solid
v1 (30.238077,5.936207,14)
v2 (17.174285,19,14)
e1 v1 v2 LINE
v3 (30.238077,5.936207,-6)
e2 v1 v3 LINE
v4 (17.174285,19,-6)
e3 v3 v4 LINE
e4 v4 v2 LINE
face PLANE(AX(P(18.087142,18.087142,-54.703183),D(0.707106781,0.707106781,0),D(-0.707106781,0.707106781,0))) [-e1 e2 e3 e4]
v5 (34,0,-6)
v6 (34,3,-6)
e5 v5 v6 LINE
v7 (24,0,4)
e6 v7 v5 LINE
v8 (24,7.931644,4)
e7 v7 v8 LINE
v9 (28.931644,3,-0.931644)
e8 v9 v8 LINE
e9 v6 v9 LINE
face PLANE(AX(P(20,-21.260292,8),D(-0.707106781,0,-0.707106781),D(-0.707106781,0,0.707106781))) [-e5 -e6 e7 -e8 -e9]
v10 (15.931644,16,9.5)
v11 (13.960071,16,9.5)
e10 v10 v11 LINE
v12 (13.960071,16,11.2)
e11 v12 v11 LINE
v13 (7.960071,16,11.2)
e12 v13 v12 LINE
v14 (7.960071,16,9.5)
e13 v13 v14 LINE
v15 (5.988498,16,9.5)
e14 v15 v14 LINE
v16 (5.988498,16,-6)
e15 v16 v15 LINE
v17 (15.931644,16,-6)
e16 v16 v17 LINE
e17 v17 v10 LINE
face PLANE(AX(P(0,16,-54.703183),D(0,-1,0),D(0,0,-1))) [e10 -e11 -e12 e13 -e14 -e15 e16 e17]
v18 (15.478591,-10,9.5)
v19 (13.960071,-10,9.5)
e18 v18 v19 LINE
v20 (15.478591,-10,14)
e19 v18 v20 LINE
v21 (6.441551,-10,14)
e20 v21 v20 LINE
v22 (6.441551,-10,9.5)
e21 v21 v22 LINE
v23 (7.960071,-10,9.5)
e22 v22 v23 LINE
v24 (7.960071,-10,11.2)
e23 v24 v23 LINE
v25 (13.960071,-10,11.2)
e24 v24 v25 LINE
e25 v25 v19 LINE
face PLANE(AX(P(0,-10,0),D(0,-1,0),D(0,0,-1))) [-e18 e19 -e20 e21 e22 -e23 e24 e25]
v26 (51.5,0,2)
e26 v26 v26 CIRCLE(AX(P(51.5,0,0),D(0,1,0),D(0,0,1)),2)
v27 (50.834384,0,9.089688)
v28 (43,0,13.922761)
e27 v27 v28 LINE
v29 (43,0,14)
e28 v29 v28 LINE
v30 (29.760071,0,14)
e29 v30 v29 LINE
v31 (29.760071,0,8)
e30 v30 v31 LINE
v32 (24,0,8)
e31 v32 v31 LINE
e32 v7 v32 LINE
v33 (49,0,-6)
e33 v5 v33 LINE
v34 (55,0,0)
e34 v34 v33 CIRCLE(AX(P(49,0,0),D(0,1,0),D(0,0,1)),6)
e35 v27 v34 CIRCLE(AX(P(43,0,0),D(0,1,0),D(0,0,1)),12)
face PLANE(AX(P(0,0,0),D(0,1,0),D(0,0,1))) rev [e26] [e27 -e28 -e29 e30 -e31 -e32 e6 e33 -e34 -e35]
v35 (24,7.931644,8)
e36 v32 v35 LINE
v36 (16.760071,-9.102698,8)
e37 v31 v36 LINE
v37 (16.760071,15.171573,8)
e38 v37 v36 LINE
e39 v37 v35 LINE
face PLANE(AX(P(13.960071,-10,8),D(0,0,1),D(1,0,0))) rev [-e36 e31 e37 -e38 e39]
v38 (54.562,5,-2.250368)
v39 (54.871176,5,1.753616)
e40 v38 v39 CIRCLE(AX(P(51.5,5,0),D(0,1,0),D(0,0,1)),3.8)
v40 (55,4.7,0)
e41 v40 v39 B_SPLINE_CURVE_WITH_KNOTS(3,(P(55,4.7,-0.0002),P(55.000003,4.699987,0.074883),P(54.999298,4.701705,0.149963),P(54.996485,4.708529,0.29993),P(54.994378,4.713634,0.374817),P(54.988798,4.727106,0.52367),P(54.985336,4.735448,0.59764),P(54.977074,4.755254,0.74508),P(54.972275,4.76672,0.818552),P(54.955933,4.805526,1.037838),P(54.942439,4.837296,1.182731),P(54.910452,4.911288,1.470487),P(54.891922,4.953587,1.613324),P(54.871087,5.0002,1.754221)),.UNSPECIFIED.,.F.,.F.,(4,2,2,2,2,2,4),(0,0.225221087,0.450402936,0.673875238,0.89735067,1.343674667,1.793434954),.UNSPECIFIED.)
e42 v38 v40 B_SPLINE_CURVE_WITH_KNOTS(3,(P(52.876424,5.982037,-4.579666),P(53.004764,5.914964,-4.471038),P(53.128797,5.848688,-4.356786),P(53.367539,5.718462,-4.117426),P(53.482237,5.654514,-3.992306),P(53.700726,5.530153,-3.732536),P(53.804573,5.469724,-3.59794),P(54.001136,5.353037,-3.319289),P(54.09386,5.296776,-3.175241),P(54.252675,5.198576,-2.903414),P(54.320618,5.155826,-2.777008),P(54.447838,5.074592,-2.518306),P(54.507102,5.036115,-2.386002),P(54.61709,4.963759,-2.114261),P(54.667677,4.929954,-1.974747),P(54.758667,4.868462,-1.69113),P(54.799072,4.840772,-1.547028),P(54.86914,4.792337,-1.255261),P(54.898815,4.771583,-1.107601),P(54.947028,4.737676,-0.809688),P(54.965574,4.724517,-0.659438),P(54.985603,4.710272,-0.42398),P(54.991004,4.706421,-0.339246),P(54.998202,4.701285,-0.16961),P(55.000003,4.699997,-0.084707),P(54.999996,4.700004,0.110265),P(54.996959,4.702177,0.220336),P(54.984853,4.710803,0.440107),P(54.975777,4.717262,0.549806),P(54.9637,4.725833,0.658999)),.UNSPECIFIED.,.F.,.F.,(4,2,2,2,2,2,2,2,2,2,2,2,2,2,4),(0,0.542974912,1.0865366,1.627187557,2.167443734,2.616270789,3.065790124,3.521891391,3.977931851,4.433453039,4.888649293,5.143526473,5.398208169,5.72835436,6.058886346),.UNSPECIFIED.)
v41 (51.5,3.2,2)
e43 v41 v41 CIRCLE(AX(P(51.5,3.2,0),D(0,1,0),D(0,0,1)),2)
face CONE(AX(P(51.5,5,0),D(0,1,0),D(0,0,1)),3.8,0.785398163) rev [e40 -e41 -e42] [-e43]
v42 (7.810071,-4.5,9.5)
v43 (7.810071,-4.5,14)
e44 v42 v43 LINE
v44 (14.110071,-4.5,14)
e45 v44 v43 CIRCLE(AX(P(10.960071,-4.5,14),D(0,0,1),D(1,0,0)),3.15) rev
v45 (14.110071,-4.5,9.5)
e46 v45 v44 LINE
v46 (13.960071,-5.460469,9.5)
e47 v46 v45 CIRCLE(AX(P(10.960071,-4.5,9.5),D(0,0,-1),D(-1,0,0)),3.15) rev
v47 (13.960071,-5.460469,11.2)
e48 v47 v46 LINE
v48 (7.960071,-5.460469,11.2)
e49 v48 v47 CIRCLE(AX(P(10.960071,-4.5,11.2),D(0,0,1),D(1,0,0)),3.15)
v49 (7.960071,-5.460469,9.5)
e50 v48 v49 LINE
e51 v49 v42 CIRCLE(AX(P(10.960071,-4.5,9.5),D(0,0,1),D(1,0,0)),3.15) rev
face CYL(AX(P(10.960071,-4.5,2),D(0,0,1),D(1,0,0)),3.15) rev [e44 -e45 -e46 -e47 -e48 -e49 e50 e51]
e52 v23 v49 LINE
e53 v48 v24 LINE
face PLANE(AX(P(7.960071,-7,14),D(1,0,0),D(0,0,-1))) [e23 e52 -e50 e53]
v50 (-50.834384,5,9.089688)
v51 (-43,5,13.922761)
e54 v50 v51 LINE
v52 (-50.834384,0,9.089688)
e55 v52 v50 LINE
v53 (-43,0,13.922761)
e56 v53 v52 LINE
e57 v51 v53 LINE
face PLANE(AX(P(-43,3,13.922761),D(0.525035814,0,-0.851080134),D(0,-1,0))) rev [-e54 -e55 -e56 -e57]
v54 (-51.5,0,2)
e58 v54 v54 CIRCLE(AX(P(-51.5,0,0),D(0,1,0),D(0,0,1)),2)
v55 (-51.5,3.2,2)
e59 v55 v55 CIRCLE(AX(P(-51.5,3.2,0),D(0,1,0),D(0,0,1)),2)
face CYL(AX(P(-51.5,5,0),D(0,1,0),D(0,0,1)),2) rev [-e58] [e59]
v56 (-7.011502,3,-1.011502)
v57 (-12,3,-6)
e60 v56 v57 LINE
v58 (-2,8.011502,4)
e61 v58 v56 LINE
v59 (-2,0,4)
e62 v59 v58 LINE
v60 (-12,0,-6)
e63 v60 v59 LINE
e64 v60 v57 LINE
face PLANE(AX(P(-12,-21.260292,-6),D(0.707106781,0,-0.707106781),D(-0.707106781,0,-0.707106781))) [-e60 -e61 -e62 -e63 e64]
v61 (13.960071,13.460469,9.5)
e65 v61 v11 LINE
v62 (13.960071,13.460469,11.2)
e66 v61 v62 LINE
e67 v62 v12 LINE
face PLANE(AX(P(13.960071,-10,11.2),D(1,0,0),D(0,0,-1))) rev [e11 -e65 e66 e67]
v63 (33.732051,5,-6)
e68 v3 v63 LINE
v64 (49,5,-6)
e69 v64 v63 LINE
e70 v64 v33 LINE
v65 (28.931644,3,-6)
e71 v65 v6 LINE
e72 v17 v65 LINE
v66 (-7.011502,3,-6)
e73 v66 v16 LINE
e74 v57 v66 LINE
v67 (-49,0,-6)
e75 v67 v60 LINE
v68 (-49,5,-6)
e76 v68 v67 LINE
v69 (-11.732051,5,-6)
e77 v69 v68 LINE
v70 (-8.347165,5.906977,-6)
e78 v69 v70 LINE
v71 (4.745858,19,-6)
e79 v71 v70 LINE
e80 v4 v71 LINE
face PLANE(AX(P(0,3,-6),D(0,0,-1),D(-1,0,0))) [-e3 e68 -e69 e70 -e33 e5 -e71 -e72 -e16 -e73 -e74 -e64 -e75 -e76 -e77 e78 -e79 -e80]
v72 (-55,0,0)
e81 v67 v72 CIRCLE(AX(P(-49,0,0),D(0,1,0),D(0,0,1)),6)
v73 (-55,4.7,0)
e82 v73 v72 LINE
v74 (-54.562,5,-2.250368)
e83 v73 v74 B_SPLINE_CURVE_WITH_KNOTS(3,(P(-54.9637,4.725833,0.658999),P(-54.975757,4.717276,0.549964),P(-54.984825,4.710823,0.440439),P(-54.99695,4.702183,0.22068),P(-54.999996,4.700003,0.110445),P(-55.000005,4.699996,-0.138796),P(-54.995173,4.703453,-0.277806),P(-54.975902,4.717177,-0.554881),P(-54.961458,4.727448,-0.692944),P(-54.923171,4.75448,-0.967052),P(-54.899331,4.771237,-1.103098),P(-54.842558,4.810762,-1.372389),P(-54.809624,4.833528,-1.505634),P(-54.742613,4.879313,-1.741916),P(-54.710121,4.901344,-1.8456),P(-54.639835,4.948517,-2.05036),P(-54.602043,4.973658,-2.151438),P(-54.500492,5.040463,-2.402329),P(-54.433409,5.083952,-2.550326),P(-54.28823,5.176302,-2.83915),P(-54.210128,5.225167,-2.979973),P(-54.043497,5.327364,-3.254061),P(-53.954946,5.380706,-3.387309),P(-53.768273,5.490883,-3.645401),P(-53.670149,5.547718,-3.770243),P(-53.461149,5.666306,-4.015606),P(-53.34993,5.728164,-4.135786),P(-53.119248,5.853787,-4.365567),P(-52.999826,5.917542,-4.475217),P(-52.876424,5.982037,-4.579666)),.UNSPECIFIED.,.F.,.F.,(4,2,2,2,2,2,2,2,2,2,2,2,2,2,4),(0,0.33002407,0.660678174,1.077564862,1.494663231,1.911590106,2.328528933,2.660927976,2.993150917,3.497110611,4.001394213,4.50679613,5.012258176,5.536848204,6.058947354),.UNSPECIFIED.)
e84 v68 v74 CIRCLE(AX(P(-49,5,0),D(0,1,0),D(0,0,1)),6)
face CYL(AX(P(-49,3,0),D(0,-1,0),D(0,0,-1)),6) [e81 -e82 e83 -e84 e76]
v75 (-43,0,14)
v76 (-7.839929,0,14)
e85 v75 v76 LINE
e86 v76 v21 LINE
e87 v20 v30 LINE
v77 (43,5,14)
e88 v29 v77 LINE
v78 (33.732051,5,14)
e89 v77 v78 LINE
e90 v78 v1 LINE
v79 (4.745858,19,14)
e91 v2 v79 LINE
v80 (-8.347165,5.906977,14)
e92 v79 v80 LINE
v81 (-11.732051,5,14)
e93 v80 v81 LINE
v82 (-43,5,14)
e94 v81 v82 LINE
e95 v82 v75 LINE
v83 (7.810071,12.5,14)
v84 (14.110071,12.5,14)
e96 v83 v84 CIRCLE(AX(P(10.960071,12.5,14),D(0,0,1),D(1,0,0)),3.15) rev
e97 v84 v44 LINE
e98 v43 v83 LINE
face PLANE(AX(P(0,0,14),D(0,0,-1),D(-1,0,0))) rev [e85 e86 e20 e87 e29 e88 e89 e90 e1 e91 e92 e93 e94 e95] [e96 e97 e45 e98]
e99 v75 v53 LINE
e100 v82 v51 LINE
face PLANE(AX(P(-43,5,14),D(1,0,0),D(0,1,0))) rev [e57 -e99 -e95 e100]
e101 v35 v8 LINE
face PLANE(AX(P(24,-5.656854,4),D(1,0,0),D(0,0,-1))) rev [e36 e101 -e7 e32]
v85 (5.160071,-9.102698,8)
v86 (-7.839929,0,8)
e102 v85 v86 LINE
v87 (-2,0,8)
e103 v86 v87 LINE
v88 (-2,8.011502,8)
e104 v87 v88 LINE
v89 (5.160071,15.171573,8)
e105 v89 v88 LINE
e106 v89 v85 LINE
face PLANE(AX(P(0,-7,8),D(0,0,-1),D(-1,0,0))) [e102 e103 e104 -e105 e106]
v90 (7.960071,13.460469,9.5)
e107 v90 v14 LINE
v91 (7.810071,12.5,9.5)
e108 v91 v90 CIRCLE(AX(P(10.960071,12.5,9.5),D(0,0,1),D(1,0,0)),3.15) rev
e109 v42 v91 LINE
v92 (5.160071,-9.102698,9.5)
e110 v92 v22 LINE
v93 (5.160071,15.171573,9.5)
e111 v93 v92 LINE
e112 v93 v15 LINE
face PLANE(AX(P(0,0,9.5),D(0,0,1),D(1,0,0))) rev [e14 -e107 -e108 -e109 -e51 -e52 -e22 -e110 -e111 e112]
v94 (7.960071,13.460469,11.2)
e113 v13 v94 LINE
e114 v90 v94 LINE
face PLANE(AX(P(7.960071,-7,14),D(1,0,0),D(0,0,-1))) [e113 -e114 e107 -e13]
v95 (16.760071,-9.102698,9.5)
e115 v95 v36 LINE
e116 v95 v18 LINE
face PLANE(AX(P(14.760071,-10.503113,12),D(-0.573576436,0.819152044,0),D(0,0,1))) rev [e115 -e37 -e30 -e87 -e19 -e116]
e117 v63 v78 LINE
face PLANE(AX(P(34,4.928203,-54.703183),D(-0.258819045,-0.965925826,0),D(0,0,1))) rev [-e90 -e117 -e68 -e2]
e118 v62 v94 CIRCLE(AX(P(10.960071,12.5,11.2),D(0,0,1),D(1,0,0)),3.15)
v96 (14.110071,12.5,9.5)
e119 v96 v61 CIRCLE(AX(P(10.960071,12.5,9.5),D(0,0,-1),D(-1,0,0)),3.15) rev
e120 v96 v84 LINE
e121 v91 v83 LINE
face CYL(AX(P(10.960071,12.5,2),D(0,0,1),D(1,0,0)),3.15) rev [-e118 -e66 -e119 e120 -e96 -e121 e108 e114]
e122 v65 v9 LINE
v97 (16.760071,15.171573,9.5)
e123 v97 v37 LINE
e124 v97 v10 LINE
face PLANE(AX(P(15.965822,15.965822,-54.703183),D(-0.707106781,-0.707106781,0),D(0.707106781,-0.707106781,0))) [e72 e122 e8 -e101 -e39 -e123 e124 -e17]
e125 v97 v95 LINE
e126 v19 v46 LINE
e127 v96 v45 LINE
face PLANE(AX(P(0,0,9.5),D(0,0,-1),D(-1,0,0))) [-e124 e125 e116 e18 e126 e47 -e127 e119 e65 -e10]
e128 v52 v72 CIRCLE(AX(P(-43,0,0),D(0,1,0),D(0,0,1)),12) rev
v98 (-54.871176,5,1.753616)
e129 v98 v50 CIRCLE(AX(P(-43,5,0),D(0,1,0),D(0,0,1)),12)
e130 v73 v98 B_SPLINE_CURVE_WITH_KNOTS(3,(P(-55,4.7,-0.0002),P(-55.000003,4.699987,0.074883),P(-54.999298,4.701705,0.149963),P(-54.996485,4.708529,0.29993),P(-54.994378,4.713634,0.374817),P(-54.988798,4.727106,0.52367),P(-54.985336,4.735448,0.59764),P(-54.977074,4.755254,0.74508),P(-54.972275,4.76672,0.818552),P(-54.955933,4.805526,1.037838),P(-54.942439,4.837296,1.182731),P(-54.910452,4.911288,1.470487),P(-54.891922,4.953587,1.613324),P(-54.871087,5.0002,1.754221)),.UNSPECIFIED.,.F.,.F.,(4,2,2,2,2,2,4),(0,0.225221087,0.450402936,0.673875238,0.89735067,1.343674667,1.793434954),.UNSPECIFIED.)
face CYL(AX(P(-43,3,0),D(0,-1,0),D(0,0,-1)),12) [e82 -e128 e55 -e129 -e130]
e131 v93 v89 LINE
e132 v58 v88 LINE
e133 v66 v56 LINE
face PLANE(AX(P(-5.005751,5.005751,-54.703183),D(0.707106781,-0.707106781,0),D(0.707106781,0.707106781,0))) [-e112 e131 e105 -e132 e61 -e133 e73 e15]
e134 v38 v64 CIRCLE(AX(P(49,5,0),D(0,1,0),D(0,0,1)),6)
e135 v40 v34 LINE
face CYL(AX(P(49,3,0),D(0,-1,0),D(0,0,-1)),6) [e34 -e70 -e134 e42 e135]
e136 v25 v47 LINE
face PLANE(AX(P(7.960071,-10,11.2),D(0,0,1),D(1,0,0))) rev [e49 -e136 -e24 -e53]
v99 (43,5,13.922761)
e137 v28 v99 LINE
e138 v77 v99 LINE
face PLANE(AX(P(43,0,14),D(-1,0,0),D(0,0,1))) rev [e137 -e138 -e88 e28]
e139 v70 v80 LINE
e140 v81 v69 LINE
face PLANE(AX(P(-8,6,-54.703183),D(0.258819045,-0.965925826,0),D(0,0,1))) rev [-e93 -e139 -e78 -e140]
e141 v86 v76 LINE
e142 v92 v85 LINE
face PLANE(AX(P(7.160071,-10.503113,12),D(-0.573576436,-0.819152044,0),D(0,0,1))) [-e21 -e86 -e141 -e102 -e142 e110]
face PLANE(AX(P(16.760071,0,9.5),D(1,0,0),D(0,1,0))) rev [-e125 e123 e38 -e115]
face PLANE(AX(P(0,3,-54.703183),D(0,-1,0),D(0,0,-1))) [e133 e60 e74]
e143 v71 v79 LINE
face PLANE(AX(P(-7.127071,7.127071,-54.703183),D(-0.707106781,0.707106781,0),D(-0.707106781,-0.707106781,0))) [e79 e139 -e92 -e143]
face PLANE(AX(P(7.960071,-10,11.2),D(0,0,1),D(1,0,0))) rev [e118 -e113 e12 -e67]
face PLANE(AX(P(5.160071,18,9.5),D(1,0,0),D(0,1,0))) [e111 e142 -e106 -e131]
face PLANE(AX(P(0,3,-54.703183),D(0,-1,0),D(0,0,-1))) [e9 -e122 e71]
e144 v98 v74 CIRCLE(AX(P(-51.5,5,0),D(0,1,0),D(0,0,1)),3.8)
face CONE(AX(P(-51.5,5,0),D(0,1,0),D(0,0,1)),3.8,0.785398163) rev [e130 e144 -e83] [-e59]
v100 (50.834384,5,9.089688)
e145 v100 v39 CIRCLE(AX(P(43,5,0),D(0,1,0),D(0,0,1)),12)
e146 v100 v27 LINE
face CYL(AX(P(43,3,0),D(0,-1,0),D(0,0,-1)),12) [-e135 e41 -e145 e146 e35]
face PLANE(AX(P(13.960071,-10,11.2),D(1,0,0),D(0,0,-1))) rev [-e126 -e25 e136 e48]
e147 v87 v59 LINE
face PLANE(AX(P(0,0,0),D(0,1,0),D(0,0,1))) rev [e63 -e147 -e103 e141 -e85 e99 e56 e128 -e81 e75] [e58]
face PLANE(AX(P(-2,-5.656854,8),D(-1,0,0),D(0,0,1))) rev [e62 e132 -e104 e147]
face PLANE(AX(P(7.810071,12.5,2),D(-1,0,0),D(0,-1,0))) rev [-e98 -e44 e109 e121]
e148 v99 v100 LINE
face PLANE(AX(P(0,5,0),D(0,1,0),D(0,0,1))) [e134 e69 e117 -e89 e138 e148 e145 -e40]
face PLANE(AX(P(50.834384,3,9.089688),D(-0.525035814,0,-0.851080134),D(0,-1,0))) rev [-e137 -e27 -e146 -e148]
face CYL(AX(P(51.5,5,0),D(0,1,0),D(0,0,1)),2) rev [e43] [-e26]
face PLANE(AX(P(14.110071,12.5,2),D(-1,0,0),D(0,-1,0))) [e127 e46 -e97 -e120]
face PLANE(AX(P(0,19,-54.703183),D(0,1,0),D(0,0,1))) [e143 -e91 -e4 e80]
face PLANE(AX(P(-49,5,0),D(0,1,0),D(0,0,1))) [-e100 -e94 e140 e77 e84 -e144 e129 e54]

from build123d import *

# Parameters (mm, degrees)
BOSS_EXTRUDE1_DEPTH           = 3
CUT_EXTRUDE1_DEPTH            = 10
CUT_EXTRUDE3_START            = 8
SKETCH8_W                     = 6
SKETCH8_H                     = 3
CUT_EXTRUDE3_DEPTH            = 6
BOSS_EXTRUDE4_START           = 18
BOSS_EXTRUDE4_DEPTH           = 28
BOSS_EXTRUDE5_DEPTH           = 3
CUT_EXTRUDE4_DEPTH            = 3
CUT_EXTRUDE5_DEPTH            = 10
SKETCH18_R                    = 1.5
BOSS_EXTRUDE9_DEPTH           = 2
CHAMFER1_SIZE                 = 15
CHAMFER2_SIZE                 = 15
CHAMFER2_SIZE_2               = 10.503113073
CUT_EXTRUDE6_DEPTH            = 5
BOSS_EXTRUDE8_DEPTH           = 2
CHAMFER3_DEPTH                = 6
CHAMFER3_2_DEPTH              = 5
CSK_FOR_M4_SFHCS1_D           = 4
CSK_FOR_M4_SFHCS1_DEPTH       = 30.798278762
CSK_FOR_M4_SFHCS1_CSINK_D     = 7.6
CSK_FOR_M4_SFHCS1_CSINK_ANGLE = 90
CSK_FOR_M4_SFHCS1_TIP         = 1.201721238
CUT_EXTRUDE7_DEPTH            = 1.5
BOSS_EXTRUDE10_START          = -6
BOSS_EXTRUDE10_DEPTH          = 20
CHAMFER4_SIZE                 = 1.07179677
CHAMFER4_SIZE_2               = 4


with BuildPart() as part:
    # Sketch1 → Boss-Extrude1 (new body)
    with BuildSketch(Plane(origin=(0, 0, 0), x_dir=(1, 0, 0), z_dir=(0, 1, 0))):
        with BuildLine():
            ThreePointArc((-49, -6), (-53.242640687, -4.242640687), (-55, 0))
            ThreePointArc((-55, 0), (-51.485281374, -8.485281374), (-43, -12))
            Line((-43, -12), (43, -12))
            ThreePointArc((43, -12), (51.485281374, -8.485281374), (55, 0))
            ThreePointArc((55, 0), (53.242640687, -4.242640687), (49, -6))
            Line((49, -6), (-49, -6))
        make_face()
        with BuildLine():
            Line((-53, 0), (-55, 0))
            ThreePointArc((-55, 0), (-53.242640687, -4.242640687), (-49, -6))
            Line((-49, -6), (49, -6))
            ThreePointArc((49, -6), (53.242640687, -4.242640687), (55, 0))
            Line((55, 0), (53, 0))
            ThreePointArc((53, 0), (51.5, -1.5), (50, 0))
            Line((50, 0), (-50, 0))
            ThreePointArc((-50, 0), (-51.5, -1.5), (-53, 0))
        make_face()
        with BuildLine():
            Line((49, 6), (-49, 6))
            ThreePointArc((-49, 6), (-53.242640687, 4.242640687), (-55, 0))
            Line((-55, 0), (-53, 0))
            ThreePointArc((-53, 0), (-51.5, 1.5), (-50, 0))
            Line((-50, 0), (50, 0))
            ThreePointArc((50, 0), (51.5, 1.5), (53, 0))
            Line((53, 0), (55, 0))
            ThreePointArc((55, 0), (53.242640687, 4.242640687), (49, 6))
        make_face()
    extrude(amount=BOSS_EXTRUDE1_DEPTH)

    # Sketch2 → Cut-Extrude1 (cut)
    with BuildSketch(Plane(origin=(0, 3, 0), x_dir=(1, 0, 0), z_dir=(0, 1, 0))):
        Polygon((22, -8), (36, 6), (-14, 6), (0, -8), align=None)
    extrude(amount=-CUT_EXTRUDE1_DEPTH, mode=Mode.SUBTRACT)

    # Sketch8 → Cut-Extrude3 (cut)
    with BuildSketch(Plane.XY.offset(CUT_EXTRUDE3_START)):
        with Locations((10.960071178, 1.5)):
            Rectangle(SKETCH8_W, SKETCH8_H)
    extrude(amount=CUT_EXTRUDE3_DEPTH, mode=Mode.SUBTRACT)


with BuildPart() as cut_extrude3_piece_1:
    # of the separate pieces the step leaves, piece 1, a body of its own (cut_extrude3_pieces)
    add(part.part.solids().sort_by_distance((-55, 0, 0))[0])

    # Sketch9 → Boss-Extrude4 (add)
    with BuildSketch(Plane(origin=(0, 0, 0), x_dir=(1, 0, 0), z_dir=(0, 1, 0)).offset(BOSS_EXTRUDE4_START)):
        Polygon((13.960071178, -11.2), (13.960071178, -8), (14.760071178, -8), (14.760071178, -12), (7.160071178, -12), (7.160071178, -8), (7.960071178, -8), (7.960071178, -11.2), align=None)
    extrude(amount=-BOSS_EXTRUDE4_DEPTH)


with BuildPart() as cut_extrude3_piece_2:
    # of the separate pieces the step leaves, piece 2, a body of its own (cut_extrude3_pieces)
    add(part.part.solids().sort_by_distance((13.960071178, 0, 12))[0])


with BuildPart() as cut_extrude3_piece_1_1:
    add(cut_extrude3_piece_1.part)

    # Combine1: union Cut-Extrude3 piece 2
    add(cut_extrude3_piece_2.part)

    # Sketch11 → Boss-Extrude5 (add)
    with BuildSketch(Plane(origin=(0, 3, 0), x_dir=(1, 0, 0), z_dir=(0, 1, 0))):
        Polygon((-14, 6), (-12, 6), (2, -8), (0, -8), align=None)
        Polygon((20, -8), (34, 6), (36, 6), (22, -8), align=None)
    extrude(amount=-BOSS_EXTRUDE5_DEPTH)

    # Sketch13 → Cut-Extrude4 (cut)
    with BuildSketch(Plane(origin=(0, 3, 0), x_dir=(1, 0, 0), z_dir=(0, 1, 0))):
        Polygon((2, -8), (-2, -8), (-2, -4), align=None)
        Polygon((24, -4), (24, -8), (20, -8), align=None)
    extrude(amount=-CUT_EXTRUDE4_DEPTH, mode=Mode.SUBTRACT)

    # Sketch15 → Cut-Extrude5 (cut)
    with BuildSketch(Plane.XY.offset(12)):
        with BuildLine():
            Line((14.110071178, 12.5), (14.110071178, -4.5))
            ThreePointArc((14.110071178, -4.5), (10.960071178, -7.65), (7.810071178, -4.5))
            Line((7.810071178, -4.5), (7.810071178, 12.5))
            ThreePointArc((7.810071178, 12.5), (10.960071178, 15.65), (14.110071178, 12.5))
        make_face()
    extrude(amount=-CUT_EXTRUDE5_DEPTH, mode=Mode.SUBTRACT)

    # Sketch18 → Boss-Extrude9 (add)
    # profile 1 of 2: a face of its own
    with BuildSketch(Plane(origin=(0, 3, 0), x_dir=(1, 0, 0), z_dir=(0, 1, 0))):
        with BuildLine():
            Line((7.160071178, -8), (-2, -8))
            Line((-2, -8), (-2, -4))
            Line((-2, -4), (-12, 6))
            Line((-12, 6), (-49, 6))
            ThreePointArc((-49, 6), (-53.242640687, 4.242640687), (-55, 0))
            ThreePointArc((-55, 0), (-51.485281374, -8.485281374), (-43, -12))
            Line((-43, -12), (7.160071178, -12))
            Line((7.160071178, -12), (7.160071178, -8))
        make_face()
        with Locations(Location((-51.5, 0, 0), (0, 0, 270))):
            Circle(SKETCH18_R, mode=Mode.SUBTRACT)
    # profile 2 of 2: a face of its own
    with BuildSketch(Plane(origin=(0, 3, 0), x_dir=(1, 0, 0), z_dir=(0, 1, 0))):
        with BuildLine():
            Line((24, -4), (24, -8))
            Line((24, -8), (14.760071178, -8))
            Line((14.760071178, -8), (14.760071178, -12))
            Line((14.760071178, -12), (43, -12))
            ThreePointArc((43, -12), (51.485281374, -8.485281374), (55, 0))
            ThreePointArc((55, 0), (53.242640687, 4.242640687), (49, 6))
            Line((49, 6), (34, 6))
            Line((34, 6), (24, -4))
        make_face()
        with Locations(Location((51.5, 0, 0), (0, 0, 270))):
            Circle(SKETCH18_R, mode=Mode.SUBTRACT)
    extrude(amount=BOSS_EXTRUDE9_DEPTH)

    # Chamfer1
    # the kernel refuses this chamfer: 15 mm, written as the material it adds along each edge
    with BuildSketch(Plane(origin=(14.760071178, 5, 8), x_dir=(0, 1, 0), z_dir=(0, 0, 1))) as chamfer1_piece_1_section:
        Polygon((CHAMFER1_SIZE, 0), (0, -CHAMFER1_SIZE), (0, 0), align=None)
    chamfer1_piece_1 = extrude(amount=4, mode=Mode.PRIVATE)
    chamfer1_piece_1 = split(chamfer1_piece_1, bisect_by=Plane(origin=(14.760071178, 18, 8), z_dir=(0, -1, 0)), keep=Keep.TOP, mode=Mode.PRIVATE)
    chamfer1_piece_1 = split(chamfer1_piece_1, bisect_by=Plane(origin=(17.380035589, 5, 10.619964411), z_dir=(-0.7071067811865474, 0, -0.7071067811865477)), keep=Keep.TOP, mode=Mode.PRIVATE)
    add(chamfer1_piece_1)
    with BuildSketch(Plane(origin=(14.760071178, 5, -30.575244819), x_dir=(0, 1, 0), z_dir=(0, 0, 1))) as chamfer1_piece_2_section:
        Polygon((CHAMFER1_SIZE, 0), (0, -CHAMFER1_SIZE), (0, 0), align=None)
    chamfer1_piece_2 = extrude(amount=42.575244819, mode=Mode.PRIVATE)
    chamfer1_piece_2 = split(chamfer1_piece_2, bisect_by=Plane(origin=(14.760071178, 5, 8), z_dir=(0, 0, -1)), keep=Keep.TOP, mode=Mode.PRIVATE)
    chamfer1_piece_2 = split(chamfer1_piece_2, bisect_by=Plane(origin=(36.667657999, 5, -8.667657999), z_dir=(0.7071067811865474, 0, 0.7071067811865477)), keep=Keep.TOP, mode=Mode.PRIVATE)
    chamfer1_piece_2 = split(chamfer1_piece_2, bisect_by=Plane(origin=(24, 5, -30.575244819), z_dir=(1, 0, 0)), keep=Keep.TOP, mode=Mode.PRIVATE)
    add(chamfer1_piece_2)
    with BuildSketch(Plane(origin=(14.760071178, 5, 8), x_dir=(0, 1, 0), z_dir=(0, 0, 1))) as chamfer1_piece_3_section:
        Polygon((CHAMFER1_SIZE, 0), (0, -CHAMFER1_SIZE), (0, 0), align=None)
    chamfer1_piece_3 = extrude(amount=4, mode=Mode.PRIVATE)
    chamfer1_piece_3 = split(chamfer1_piece_3, bisect_by=Plane(origin=(14.760071178, 18, 8), z_dir=(0, -1, 0)), keep=Keep.TOP, mode=Mode.PRIVATE)
    chamfer1_piece_3 = split(chamfer1_piece_3, bisect_by=Plane(origin=(17.380035589, 5, 10.619964411), z_dir=(0.7071067811865474, 0, 0.7071067811865477)), keep=Keep.TOP, mode=Mode.PRIVATE)
    chamfer1_piece_3 = split(chamfer1_piece_3, bisect_by=Plane(origin=(24, 5, 8), z_dir=(-1, 0, 0)), keep=Keep.TOP, mode=Mode.PRIVATE)
    add(chamfer1_piece_3)
    with BuildSketch(Plane(origin=(14.760071178, 5, 8), x_dir=(0, 1, 0), z_dir=(0, 0, 1))) as chamfer1_piece_4_section:
        Polygon((CHAMFER1_SIZE, 0), (0, -CHAMFER1_SIZE), (0, 0), align=None)
    chamfer1_piece_4 = extrude(amount=4, mode=Mode.PRIVATE)
    chamfer1_piece_4 = split(chamfer1_piece_4, bisect_by=Plane(origin=(24, 5, 8), z_dir=(1, 0, 0)), keep=Keep.TOP, mode=Mode.PRIVATE)
    add(chamfer1_piece_4)
    with BuildSketch(Plane(origin=(7.160071178, 5, 12), x_dir=(0, 1, 0), z_dir=(0, 0, -1))) as chamfer1_piece_5_section:
        Polygon((CHAMFER1_SIZE, 0), (0, -CHAMFER1_SIZE), (0, 0), align=None)
    chamfer1_piece_5 = extrude(amount=4, mode=Mode.PRIVATE)
    chamfer1_piece_5 = split(chamfer1_piece_5, bisect_by=Plane(origin=(6.580035589, 5, 12.580035589), z_dir=(-0.7071067811865489, 0, 0.7071067811865461)), keep=Keep.TOP, mode=Mode.PRIVATE)
    chamfer1_piece_5 = split(chamfer1_piece_5, bisect_by=Plane(origin=(-2, 5, 12), z_dir=(1, 0, 0)), keep=Keep.TOP, mode=Mode.PRIVATE)
    chamfer1_piece_5 = split(chamfer1_piece_5, bisect_by=Plane(origin=(7.160071178, 18, 12), z_dir=(0, -1, 0)), keep=Keep.TOP, mode=Mode.PRIVATE)
    add(chamfer1_piece_5)
    with BuildSketch(Plane(origin=(7.160071178, 5, 12), x_dir=(0, 1, 0), z_dir=(0, 0, -1))) as chamfer1_piece_6_section:
        Polygon((CHAMFER1_SIZE, 0), (0, -CHAMFER1_SIZE), (0, 0), align=None)
    chamfer1_piece_6 = extrude(amount=4, mode=Mode.PRIVATE)
    chamfer1_piece_6 = split(chamfer1_piece_6, bisect_by=Plane(origin=(-2, 5, 12), z_dir=(-1, 0, 0)), keep=Keep.TOP, mode=Mode.PRIVATE)
    add(chamfer1_piece_6)
    with BuildSketch(Plane(origin=(7.160071178, 5, 12), x_dir=(0, 1, 0), z_dir=(0, 0, -1))) as chamfer1_piece_7_section:
        Polygon((CHAMFER1_SIZE, 0), (0, -CHAMFER1_SIZE), (0, 0), align=None)
    chamfer1_piece_7 = extrude(amount=4, mode=Mode.PRIVATE)
    chamfer1_piece_7 = split(chamfer1_piece_7, bisect_by=Plane(origin=(6.580035589, 5, 12.580035589), z_dir=(0.7071067811865489, 0, -0.7071067811865461)), keep=Keep.TOP, mode=Mode.PRIVATE)
    chamfer1_piece_7 = split(chamfer1_piece_7, bisect_by=Plane(origin=(7.160071178, 18, 12), z_dir=(0, -1, 0)), keep=Keep.TOP, mode=Mode.PRIVATE)
    add(chamfer1_piece_7)
    with BuildSketch(Plane(origin=(7.160071178, 5, 12), x_dir=(0, 1, 0), z_dir=(0, 0, -1))) as chamfer1_piece_8_section:
        Polygon((CHAMFER1_SIZE, 0), (0, -CHAMFER1_SIZE), (0, 0), align=None)
    chamfer1_piece_8 = extrude(amount=42.575244819, mode=Mode.PRIVATE)
    chamfer1_piece_8 = split(chamfer1_piece_8, bisect_by=Plane(origin=(6.580035589, 5, 12.580035589), z_dir=(-0.7071067811865489, 0, 0.7071067811865461)), keep=Keep.TOP, mode=Mode.PRIVATE)
    chamfer1_piece_8 = split(chamfer1_piece_8, bisect_by=Plane(origin=(-2, 5, 12), z_dir=(-1, 0, 0)), keep=Keep.TOP, mode=Mode.PRIVATE)
    chamfer1_piece_8 = split(chamfer1_piece_8, bisect_by=Plane(origin=(7.160071178, 5, 8), z_dir=(0, 0, -1)), keep=Keep.TOP, mode=Mode.PRIVATE)
    add(chamfer1_piece_8)

    # Chamfer2
    # the kernel refuses this chamfer: 15, 10.503113073 mm, written as the material it adds along each edge
    with BuildSketch(Plane(origin=(7.160071178, 0, 12), x_dir=(-1, 0, 0), z_dir=(0, 0, -1))) as chamfer2_piece_1_section:
        Polygon((CHAMFER2_SIZE, 0), (0, -CHAMFER2_SIZE_2), (0, 0), align=None)
    chamfer2_piece_1 = extrude(amount=4, mode=Mode.PRIVATE)
    chamfer2_piece_1 = split(chamfer2_piece_1, bisect_by=Plane(origin=(-2, 0, 12), z_dir=(-1, 0, 0)), keep=Keep.TOP, mode=Mode.PRIVATE)
    add(chamfer2_piece_1)
    with BuildSketch(Plane(origin=(7.160071178, 0, 12), x_dir=(-1, 0, 0), z_dir=(0, 0, -1))) as chamfer2_piece_2_section:
        Polygon((CHAMFER2_SIZE, 0), (0, -CHAMFER2_SIZE_2), (0, 0), align=None)
    chamfer2_piece_2 = extrude(amount=4, mode=Mode.PRIVATE)
    chamfer2_piece_2 = split(chamfer2_piece_2, bisect_by=Plane(origin=(6.580035589, 0, 12.580035589), z_dir=(-0.7071067811865476, 0, 0.7071067811865476)), keep=Keep.TOP, mode=Mode.PRIVATE)
    chamfer2_piece_2 = split(chamfer2_piece_2, bisect_by=Plane(origin=(-2, 0, 12), z_dir=(1, 0, 0)), keep=Keep.TOP, mode=Mode.PRIVATE)
    add(chamfer2_piece_2)
    with BuildSketch(Plane(origin=(7.160071178, 0, 12), x_dir=(-1, 0, 0), z_dir=(0, 0, -1))) as chamfer2_piece_3_section:
        Polygon((CHAMFER2_SIZE, 0), (0, -CHAMFER2_SIZE_2), (0, 0), align=None)
    chamfer2_piece_3 = extrude(amount=42.738283454, mode=Mode.PRIVATE)
    chamfer2_piece_3 = split(chamfer2_piece_3, bisect_by=Plane(origin=(6.580035589, 0, 12.580035589), z_dir=(-0.7071067811865476, 0, 0.7071067811865476)), keep=Keep.TOP, mode=Mode.PRIVATE)
    chamfer2_piece_3 = split(chamfer2_piece_3, bisect_by=Plane(origin=(7.160071178, 0, 8), z_dir=(0, 0, -1)), keep=Keep.TOP, mode=Mode.PRIVATE)
    chamfer2_piece_3 = split(chamfer2_piece_3, bisect_by=Plane(origin=(-2, 0, 12), z_dir=(-1, 0, 0)), keep=Keep.TOP, mode=Mode.PRIVATE)
    add(chamfer2_piece_3)
    with BuildSketch(Plane(origin=(7.160071178, 0, 12), x_dir=(-1, 0, 0), z_dir=(0, 0, -1))) as chamfer2_piece_4_section:
        Polygon((CHAMFER2_SIZE, 0), (0, -CHAMFER2_SIZE_2), (0, 0), align=None)
    chamfer2_piece_4 = extrude(amount=4, mode=Mode.PRIVATE)
    chamfer2_piece_4 = split(chamfer2_piece_4, bisect_by=Plane(origin=(6.580035589, 0, 12.580035589), z_dir=(0.7071067811865476, 0, -0.7071067811865476)), keep=Keep.TOP, mode=Mode.PRIVATE)
    chamfer2_piece_4 = split(chamfer2_piece_4, bisect_by=Plane(origin=(7.160071178, -10, 12), z_dir=(0, 1, 0)), keep=Keep.TOP, mode=Mode.PRIVATE)
    add(chamfer2_piece_4)
    with BuildSketch(Plane(origin=(14.760071178, 0, 12), x_dir=(0, -1, 0), z_dir=(0, 0, -1))) as chamfer2_piece_5_section:
        Polygon((CHAMFER2_SIZE_2, 0), (0, -CHAMFER2_SIZE), (0, 0), align=None)
    chamfer2_piece_5 = extrude(amount=4, mode=Mode.PRIVATE)
    chamfer2_piece_5 = split(chamfer2_piece_5, bisect_by=Plane(origin=(15.380035589, 0, 12.619964411), z_dir=(0.7071067811865476, 0, 0.7071067811865476)), keep=Keep.TOP, mode=Mode.PRIVATE)
    chamfer2_piece_5 = split(chamfer2_piece_5, bisect_by=Plane(origin=(24, 0, 12), z_dir=(-1, 0, 0)), keep=Keep.TOP, mode=Mode.PRIVATE)
    add(chamfer2_piece_5)
    with BuildSketch(Plane(origin=(14.760071178, 0, 12), x_dir=(0, -1, 0), z_dir=(0, 0, -1))) as chamfer2_piece_6_section:
        Polygon((CHAMFER2_SIZE_2, 0), (0, -CHAMFER2_SIZE), (0, 0), align=None)
    chamfer2_piece_6 = extrude(amount=4, mode=Mode.PRIVATE)
    chamfer2_piece_6 = split(chamfer2_piece_6, bisect_by=Plane(origin=(24, 0, 12), z_dir=(1, 0, 0)), keep=Keep.TOP, mode=Mode.PRIVATE)
    add(chamfer2_piece_6)
    with BuildSketch(Plane(origin=(14.760071178, 0, 12), x_dir=(0, -1, 0), z_dir=(0, 0, -1))) as chamfer2_piece_7_section:
        Polygon((CHAMFER2_SIZE_2, 0), (0, -CHAMFER2_SIZE), (0, 0), align=None)
    chamfer2_piece_7 = extrude(amount=4, mode=Mode.PRIVATE)
    chamfer2_piece_7 = split(chamfer2_piece_7, bisect_by=Plane(origin=(14.760071178, -10, 12), z_dir=(0, 1, 0)), keep=Keep.TOP, mode=Mode.PRIVATE)
    chamfer2_piece_7 = split(chamfer2_piece_7, bisect_by=Plane(origin=(15.380035589, 0, 12.619964411), z_dir=(-0.7071067811865476, 0, -0.7071067811865476)), keep=Keep.TOP, mode=Mode.PRIVATE)
    add(chamfer2_piece_7)
    with BuildSketch(Plane(origin=(14.760071178, 0, 12), x_dir=(0, -1, 0), z_dir=(0, 0, -1))) as chamfer2_piece_8_section:
        Polygon((CHAMFER2_SIZE_2, 0), (0, -CHAMFER2_SIZE), (0, 0), align=None)
    chamfer2_piece_8 = extrude(amount=42.738283454, mode=Mode.PRIVATE)
    chamfer2_piece_8 = split(chamfer2_piece_8, bisect_by=Plane(origin=(14.760071178, 0, 8), z_dir=(0, 0, -1)), keep=Keep.TOP, mode=Mode.PRIVATE)
    chamfer2_piece_8 = split(chamfer2_piece_8, bisect_by=Plane(origin=(15.380035589, 0, 12.619964411), z_dir=(0.7071067811865476, 0, 0.7071067811865476)), keep=Keep.TOP, mode=Mode.PRIVATE)
    chamfer2_piece_8 = split(chamfer2_piece_8, bisect_by=Plane(origin=(24, 0, 12), z_dir=(1, 0, 0)), keep=Keep.TOP, mode=Mode.PRIVATE)
    add(chamfer2_piece_8)

    # Sketch16 → Cut-Extrude6 (cut)
    with BuildSketch(Plane(origin=(0, 0, 0), x_dir=(1, 0, 0), z_dir=(0, 1, 0))):
        Polygon((-7.839928822, 1.839928822), (-2, -4), (-2, -8), (-7.839928822, -8), align=None)
        Polygon((24, -8), (24, -4), (29.760071178, 1.760071178), (29.760071178, -8), align=None)
    extrude(amount=-CUT_EXTRUDE6_DEPTH, mode=Mode.SUBTRACT)

    # Sketch17 → Boss-Extrude8 (add)
    with BuildSketch(Plane.XY.offset(12)):
        Polygon((-7.839928822, 0), (6.441551245, -10), (15.47859111, -10), (29.760071178, 0), (43, 0), (43, 5), (29.760071178, 5), (16.760071178, 18), (5.160071178, 18), (-7.839928822, 5), (-43, 5), (-43, 0), align=None)
        with BuildLine():
            Line((7.810071178, -4.5), (7.810071178, 12.5))
            ThreePointArc((7.810071178, 12.5), (10.960071178, 15.65), (14.110071178, 12.5))
            Line((14.110071178, 12.5), (14.110071178, -4.5))
            ThreePointArc((14.110071178, -4.5), (10.960071178, -7.65), (7.810071178, -4.5))
        make_face(mode=Mode.SUBTRACT)
    extrude(amount=BOSS_EXTRUDE8_DEPTH)

    # Chamfer3: read off the stored shape, not the designer's step
    # Chamfer3 outline → Chamfer3 (cut)
    with BuildSketch(Plane(origin=(0, 0, 0), x_dir=(1, 0, 0), z_dir=(0, 1, 0))):
        with BuildLine():
            ThreePointArc((47.608318931, -11.079864468), (49.300429772, -10.212961602), (50.834384089, -9.08968789))
            Line((50.834384089, -9.08968789), (47.608318931, -11.079864468))
        make_face()
        with BuildLine():
            ThreePointArc((-50.834384089, -9.08968789), (-49.300429772, -10.212961602), (-47.608318931, -11.079864468))
            Line((-47.608318931, -11.079864468), (-50.834384089, -9.08968789))
        make_face()
    extrude(amount=CHAMFER3_DEPTH, mode=Mode.SUBTRACT)

    # Chamfer3 2 outline → Chamfer3 2 (add)
    with BuildSketch(Plane(origin=(0, 0, 0), x_dir=(1, 0, 0), z_dir=(0, 1, 0))):
        with BuildLine():
            Line((43, -13.922760673), (47.608318931, -11.079864468))
            ThreePointArc((47.608318931, -11.079864468), (45.349641077, -11.767717995), (43, -12))
            Line((43, -12), (43, -13.922760673))
        make_face()
        with BuildLine():
            Line((-47.608318931, -11.079864468), (-43, -13.922760673))
            Line((-43, -13.922760673), (-43, -12))
            ThreePointArc((-43, -12), (-45.349641077, -11.767717995), (-47.608318931, -11.079864468))
        make_face()
    extrude(amount=CHAMFER3_2_DEPTH)

    # CSK for M4 SFHCS1
    with Locations(Plane(origin=(0, 5, 0), x_dir=(1, 0, 0), z_dir=(0, 1, 0))):
        with Locations((-51.5, 0), (51.5, 0)):
            CounterSinkHole(CSK_FOR_M4_SFHCS1_D / 2, CSK_FOR_M4_SFHCS1_CSINK_D / 2, depth=CSK_FOR_M4_SFHCS1_DEPTH, counter_sink_angle=CSK_FOR_M4_SFHCS1_CSINK_ANGLE)
            with Locations((0, 0, -(CSK_FOR_M4_SFHCS1_DEPTH + CSK_FOR_M4_SFHCS1_TIP / 2))):  # 118° drill point
                Cone(0, CSK_FOR_M4_SFHCS1_D / 2, CSK_FOR_M4_SFHCS1_TIP, mode=Mode.SUBTRACT)

    # Sketch21 → Cut-Extrude7 (cut)
    with BuildSketch(Plane(origin=(0, 0, 8), x_dir=(-1, 0, 0), z_dir=(0, 0, -1))):
        Polygon((-13.960071178, -10), (-13.960071178, 18), (-16.760071178, 18), (-16.760071178, -9.102697997), (-15.47859111, -10), align=None)
        Polygon((-7.960071178, -10), (-7.960071178, 18), (-5.160071178, 18), (-5.160071178, -9.102697997), (-6.441551245, -10), align=None)
    extrude(amount=-CUT_EXTRUDE7_DEPTH, mode=Mode.SUBTRACT)

    # Sketch22 → Boss-Extrude10 (add)
    with BuildSketch(Plane.XY.offset(BOSS_EXTRUDE10_START)):
        Polygon((34, 3), (28.931644053, 3), (15.931644053, 16), (5.988498302, 16), (-7.011501698, 3), (-12, 3), (-12, 6), (-8.254142385, 6), (4.745857615, 19), (17.17428474, 19), (30.17428474, 6), (34, 6), align=None)
    extrude(amount=BOSS_EXTRUDE10_DEPTH)

    # Chamfer4
    # the kernel refuses this chamfer: 4, 1.07179677 mm, written as the material it takes off along each edge
    with BuildSketch(Plane(origin=(-12, 6, -16.386886281), x_dir=(0, -1, 0), z_dir=(0, 0, 1))) as chamfer4_piece_1_section:
        Polygon((CHAMFER4_SIZE, 0), (0, CHAMFER4_SIZE_2), (0, 0), align=None)
    chamfer4_piece_1 = extrude(amount=40.773772562, mode=Mode.PRIVATE)
    chamfer4_piece_1 = split(chamfer4_piece_1, bisect_by=Plane(origin=(-12, 5, -16.386886281), z_dir=(0, 1, 0)), keep=Keep.TOP, mode=Mode.PRIVATE)
    chamfer4_piece_1 = split(chamfer4_piece_1, bisect_by=Plane(origin=(-10.127071192, 4.127071192, -16.386886281), z_dir=(-0.707106781186548, 0.7071067811865472, 0)), keep=Keep.TOP, mode=Mode.PRIVATE)
    add(chamfer4_piece_1, mode=Mode.SUBTRACT)
    with BuildSketch(Plane(origin=(34, 6, -16.386886281), x_dir=(-1, 0, 0), z_dir=(0, 0, 1))) as chamfer4_piece_2_section:
        Polygon((CHAMFER4_SIZE_2, 0), (0, CHAMFER4_SIZE), (0, 0), align=None)
    chamfer4_piece_2 = extrude(amount=40.773772562, mode=Mode.PRIVATE)
    chamfer4_piece_2 = split(chamfer4_piece_2, bisect_by=Plane(origin=(34, 5, -16.386886281), z_dir=(0, 1, 0)), keep=Keep.TOP, mode=Mode.PRIVATE)
    chamfer4_piece_2 = split(chamfer4_piece_2, bisect_by=Plane(origin=(32.08714237, 4.08714237, -16.386886281), z_dir=(0.7071067811865475, 0.7071067811865476, 0)), keep=Keep.TOP, mode=Mode.PRIVATE)
    add(chamfer4_piece_2, mode=Mode.SUBTRACT)


solid = cut_extrude3_piece_1_1.part
